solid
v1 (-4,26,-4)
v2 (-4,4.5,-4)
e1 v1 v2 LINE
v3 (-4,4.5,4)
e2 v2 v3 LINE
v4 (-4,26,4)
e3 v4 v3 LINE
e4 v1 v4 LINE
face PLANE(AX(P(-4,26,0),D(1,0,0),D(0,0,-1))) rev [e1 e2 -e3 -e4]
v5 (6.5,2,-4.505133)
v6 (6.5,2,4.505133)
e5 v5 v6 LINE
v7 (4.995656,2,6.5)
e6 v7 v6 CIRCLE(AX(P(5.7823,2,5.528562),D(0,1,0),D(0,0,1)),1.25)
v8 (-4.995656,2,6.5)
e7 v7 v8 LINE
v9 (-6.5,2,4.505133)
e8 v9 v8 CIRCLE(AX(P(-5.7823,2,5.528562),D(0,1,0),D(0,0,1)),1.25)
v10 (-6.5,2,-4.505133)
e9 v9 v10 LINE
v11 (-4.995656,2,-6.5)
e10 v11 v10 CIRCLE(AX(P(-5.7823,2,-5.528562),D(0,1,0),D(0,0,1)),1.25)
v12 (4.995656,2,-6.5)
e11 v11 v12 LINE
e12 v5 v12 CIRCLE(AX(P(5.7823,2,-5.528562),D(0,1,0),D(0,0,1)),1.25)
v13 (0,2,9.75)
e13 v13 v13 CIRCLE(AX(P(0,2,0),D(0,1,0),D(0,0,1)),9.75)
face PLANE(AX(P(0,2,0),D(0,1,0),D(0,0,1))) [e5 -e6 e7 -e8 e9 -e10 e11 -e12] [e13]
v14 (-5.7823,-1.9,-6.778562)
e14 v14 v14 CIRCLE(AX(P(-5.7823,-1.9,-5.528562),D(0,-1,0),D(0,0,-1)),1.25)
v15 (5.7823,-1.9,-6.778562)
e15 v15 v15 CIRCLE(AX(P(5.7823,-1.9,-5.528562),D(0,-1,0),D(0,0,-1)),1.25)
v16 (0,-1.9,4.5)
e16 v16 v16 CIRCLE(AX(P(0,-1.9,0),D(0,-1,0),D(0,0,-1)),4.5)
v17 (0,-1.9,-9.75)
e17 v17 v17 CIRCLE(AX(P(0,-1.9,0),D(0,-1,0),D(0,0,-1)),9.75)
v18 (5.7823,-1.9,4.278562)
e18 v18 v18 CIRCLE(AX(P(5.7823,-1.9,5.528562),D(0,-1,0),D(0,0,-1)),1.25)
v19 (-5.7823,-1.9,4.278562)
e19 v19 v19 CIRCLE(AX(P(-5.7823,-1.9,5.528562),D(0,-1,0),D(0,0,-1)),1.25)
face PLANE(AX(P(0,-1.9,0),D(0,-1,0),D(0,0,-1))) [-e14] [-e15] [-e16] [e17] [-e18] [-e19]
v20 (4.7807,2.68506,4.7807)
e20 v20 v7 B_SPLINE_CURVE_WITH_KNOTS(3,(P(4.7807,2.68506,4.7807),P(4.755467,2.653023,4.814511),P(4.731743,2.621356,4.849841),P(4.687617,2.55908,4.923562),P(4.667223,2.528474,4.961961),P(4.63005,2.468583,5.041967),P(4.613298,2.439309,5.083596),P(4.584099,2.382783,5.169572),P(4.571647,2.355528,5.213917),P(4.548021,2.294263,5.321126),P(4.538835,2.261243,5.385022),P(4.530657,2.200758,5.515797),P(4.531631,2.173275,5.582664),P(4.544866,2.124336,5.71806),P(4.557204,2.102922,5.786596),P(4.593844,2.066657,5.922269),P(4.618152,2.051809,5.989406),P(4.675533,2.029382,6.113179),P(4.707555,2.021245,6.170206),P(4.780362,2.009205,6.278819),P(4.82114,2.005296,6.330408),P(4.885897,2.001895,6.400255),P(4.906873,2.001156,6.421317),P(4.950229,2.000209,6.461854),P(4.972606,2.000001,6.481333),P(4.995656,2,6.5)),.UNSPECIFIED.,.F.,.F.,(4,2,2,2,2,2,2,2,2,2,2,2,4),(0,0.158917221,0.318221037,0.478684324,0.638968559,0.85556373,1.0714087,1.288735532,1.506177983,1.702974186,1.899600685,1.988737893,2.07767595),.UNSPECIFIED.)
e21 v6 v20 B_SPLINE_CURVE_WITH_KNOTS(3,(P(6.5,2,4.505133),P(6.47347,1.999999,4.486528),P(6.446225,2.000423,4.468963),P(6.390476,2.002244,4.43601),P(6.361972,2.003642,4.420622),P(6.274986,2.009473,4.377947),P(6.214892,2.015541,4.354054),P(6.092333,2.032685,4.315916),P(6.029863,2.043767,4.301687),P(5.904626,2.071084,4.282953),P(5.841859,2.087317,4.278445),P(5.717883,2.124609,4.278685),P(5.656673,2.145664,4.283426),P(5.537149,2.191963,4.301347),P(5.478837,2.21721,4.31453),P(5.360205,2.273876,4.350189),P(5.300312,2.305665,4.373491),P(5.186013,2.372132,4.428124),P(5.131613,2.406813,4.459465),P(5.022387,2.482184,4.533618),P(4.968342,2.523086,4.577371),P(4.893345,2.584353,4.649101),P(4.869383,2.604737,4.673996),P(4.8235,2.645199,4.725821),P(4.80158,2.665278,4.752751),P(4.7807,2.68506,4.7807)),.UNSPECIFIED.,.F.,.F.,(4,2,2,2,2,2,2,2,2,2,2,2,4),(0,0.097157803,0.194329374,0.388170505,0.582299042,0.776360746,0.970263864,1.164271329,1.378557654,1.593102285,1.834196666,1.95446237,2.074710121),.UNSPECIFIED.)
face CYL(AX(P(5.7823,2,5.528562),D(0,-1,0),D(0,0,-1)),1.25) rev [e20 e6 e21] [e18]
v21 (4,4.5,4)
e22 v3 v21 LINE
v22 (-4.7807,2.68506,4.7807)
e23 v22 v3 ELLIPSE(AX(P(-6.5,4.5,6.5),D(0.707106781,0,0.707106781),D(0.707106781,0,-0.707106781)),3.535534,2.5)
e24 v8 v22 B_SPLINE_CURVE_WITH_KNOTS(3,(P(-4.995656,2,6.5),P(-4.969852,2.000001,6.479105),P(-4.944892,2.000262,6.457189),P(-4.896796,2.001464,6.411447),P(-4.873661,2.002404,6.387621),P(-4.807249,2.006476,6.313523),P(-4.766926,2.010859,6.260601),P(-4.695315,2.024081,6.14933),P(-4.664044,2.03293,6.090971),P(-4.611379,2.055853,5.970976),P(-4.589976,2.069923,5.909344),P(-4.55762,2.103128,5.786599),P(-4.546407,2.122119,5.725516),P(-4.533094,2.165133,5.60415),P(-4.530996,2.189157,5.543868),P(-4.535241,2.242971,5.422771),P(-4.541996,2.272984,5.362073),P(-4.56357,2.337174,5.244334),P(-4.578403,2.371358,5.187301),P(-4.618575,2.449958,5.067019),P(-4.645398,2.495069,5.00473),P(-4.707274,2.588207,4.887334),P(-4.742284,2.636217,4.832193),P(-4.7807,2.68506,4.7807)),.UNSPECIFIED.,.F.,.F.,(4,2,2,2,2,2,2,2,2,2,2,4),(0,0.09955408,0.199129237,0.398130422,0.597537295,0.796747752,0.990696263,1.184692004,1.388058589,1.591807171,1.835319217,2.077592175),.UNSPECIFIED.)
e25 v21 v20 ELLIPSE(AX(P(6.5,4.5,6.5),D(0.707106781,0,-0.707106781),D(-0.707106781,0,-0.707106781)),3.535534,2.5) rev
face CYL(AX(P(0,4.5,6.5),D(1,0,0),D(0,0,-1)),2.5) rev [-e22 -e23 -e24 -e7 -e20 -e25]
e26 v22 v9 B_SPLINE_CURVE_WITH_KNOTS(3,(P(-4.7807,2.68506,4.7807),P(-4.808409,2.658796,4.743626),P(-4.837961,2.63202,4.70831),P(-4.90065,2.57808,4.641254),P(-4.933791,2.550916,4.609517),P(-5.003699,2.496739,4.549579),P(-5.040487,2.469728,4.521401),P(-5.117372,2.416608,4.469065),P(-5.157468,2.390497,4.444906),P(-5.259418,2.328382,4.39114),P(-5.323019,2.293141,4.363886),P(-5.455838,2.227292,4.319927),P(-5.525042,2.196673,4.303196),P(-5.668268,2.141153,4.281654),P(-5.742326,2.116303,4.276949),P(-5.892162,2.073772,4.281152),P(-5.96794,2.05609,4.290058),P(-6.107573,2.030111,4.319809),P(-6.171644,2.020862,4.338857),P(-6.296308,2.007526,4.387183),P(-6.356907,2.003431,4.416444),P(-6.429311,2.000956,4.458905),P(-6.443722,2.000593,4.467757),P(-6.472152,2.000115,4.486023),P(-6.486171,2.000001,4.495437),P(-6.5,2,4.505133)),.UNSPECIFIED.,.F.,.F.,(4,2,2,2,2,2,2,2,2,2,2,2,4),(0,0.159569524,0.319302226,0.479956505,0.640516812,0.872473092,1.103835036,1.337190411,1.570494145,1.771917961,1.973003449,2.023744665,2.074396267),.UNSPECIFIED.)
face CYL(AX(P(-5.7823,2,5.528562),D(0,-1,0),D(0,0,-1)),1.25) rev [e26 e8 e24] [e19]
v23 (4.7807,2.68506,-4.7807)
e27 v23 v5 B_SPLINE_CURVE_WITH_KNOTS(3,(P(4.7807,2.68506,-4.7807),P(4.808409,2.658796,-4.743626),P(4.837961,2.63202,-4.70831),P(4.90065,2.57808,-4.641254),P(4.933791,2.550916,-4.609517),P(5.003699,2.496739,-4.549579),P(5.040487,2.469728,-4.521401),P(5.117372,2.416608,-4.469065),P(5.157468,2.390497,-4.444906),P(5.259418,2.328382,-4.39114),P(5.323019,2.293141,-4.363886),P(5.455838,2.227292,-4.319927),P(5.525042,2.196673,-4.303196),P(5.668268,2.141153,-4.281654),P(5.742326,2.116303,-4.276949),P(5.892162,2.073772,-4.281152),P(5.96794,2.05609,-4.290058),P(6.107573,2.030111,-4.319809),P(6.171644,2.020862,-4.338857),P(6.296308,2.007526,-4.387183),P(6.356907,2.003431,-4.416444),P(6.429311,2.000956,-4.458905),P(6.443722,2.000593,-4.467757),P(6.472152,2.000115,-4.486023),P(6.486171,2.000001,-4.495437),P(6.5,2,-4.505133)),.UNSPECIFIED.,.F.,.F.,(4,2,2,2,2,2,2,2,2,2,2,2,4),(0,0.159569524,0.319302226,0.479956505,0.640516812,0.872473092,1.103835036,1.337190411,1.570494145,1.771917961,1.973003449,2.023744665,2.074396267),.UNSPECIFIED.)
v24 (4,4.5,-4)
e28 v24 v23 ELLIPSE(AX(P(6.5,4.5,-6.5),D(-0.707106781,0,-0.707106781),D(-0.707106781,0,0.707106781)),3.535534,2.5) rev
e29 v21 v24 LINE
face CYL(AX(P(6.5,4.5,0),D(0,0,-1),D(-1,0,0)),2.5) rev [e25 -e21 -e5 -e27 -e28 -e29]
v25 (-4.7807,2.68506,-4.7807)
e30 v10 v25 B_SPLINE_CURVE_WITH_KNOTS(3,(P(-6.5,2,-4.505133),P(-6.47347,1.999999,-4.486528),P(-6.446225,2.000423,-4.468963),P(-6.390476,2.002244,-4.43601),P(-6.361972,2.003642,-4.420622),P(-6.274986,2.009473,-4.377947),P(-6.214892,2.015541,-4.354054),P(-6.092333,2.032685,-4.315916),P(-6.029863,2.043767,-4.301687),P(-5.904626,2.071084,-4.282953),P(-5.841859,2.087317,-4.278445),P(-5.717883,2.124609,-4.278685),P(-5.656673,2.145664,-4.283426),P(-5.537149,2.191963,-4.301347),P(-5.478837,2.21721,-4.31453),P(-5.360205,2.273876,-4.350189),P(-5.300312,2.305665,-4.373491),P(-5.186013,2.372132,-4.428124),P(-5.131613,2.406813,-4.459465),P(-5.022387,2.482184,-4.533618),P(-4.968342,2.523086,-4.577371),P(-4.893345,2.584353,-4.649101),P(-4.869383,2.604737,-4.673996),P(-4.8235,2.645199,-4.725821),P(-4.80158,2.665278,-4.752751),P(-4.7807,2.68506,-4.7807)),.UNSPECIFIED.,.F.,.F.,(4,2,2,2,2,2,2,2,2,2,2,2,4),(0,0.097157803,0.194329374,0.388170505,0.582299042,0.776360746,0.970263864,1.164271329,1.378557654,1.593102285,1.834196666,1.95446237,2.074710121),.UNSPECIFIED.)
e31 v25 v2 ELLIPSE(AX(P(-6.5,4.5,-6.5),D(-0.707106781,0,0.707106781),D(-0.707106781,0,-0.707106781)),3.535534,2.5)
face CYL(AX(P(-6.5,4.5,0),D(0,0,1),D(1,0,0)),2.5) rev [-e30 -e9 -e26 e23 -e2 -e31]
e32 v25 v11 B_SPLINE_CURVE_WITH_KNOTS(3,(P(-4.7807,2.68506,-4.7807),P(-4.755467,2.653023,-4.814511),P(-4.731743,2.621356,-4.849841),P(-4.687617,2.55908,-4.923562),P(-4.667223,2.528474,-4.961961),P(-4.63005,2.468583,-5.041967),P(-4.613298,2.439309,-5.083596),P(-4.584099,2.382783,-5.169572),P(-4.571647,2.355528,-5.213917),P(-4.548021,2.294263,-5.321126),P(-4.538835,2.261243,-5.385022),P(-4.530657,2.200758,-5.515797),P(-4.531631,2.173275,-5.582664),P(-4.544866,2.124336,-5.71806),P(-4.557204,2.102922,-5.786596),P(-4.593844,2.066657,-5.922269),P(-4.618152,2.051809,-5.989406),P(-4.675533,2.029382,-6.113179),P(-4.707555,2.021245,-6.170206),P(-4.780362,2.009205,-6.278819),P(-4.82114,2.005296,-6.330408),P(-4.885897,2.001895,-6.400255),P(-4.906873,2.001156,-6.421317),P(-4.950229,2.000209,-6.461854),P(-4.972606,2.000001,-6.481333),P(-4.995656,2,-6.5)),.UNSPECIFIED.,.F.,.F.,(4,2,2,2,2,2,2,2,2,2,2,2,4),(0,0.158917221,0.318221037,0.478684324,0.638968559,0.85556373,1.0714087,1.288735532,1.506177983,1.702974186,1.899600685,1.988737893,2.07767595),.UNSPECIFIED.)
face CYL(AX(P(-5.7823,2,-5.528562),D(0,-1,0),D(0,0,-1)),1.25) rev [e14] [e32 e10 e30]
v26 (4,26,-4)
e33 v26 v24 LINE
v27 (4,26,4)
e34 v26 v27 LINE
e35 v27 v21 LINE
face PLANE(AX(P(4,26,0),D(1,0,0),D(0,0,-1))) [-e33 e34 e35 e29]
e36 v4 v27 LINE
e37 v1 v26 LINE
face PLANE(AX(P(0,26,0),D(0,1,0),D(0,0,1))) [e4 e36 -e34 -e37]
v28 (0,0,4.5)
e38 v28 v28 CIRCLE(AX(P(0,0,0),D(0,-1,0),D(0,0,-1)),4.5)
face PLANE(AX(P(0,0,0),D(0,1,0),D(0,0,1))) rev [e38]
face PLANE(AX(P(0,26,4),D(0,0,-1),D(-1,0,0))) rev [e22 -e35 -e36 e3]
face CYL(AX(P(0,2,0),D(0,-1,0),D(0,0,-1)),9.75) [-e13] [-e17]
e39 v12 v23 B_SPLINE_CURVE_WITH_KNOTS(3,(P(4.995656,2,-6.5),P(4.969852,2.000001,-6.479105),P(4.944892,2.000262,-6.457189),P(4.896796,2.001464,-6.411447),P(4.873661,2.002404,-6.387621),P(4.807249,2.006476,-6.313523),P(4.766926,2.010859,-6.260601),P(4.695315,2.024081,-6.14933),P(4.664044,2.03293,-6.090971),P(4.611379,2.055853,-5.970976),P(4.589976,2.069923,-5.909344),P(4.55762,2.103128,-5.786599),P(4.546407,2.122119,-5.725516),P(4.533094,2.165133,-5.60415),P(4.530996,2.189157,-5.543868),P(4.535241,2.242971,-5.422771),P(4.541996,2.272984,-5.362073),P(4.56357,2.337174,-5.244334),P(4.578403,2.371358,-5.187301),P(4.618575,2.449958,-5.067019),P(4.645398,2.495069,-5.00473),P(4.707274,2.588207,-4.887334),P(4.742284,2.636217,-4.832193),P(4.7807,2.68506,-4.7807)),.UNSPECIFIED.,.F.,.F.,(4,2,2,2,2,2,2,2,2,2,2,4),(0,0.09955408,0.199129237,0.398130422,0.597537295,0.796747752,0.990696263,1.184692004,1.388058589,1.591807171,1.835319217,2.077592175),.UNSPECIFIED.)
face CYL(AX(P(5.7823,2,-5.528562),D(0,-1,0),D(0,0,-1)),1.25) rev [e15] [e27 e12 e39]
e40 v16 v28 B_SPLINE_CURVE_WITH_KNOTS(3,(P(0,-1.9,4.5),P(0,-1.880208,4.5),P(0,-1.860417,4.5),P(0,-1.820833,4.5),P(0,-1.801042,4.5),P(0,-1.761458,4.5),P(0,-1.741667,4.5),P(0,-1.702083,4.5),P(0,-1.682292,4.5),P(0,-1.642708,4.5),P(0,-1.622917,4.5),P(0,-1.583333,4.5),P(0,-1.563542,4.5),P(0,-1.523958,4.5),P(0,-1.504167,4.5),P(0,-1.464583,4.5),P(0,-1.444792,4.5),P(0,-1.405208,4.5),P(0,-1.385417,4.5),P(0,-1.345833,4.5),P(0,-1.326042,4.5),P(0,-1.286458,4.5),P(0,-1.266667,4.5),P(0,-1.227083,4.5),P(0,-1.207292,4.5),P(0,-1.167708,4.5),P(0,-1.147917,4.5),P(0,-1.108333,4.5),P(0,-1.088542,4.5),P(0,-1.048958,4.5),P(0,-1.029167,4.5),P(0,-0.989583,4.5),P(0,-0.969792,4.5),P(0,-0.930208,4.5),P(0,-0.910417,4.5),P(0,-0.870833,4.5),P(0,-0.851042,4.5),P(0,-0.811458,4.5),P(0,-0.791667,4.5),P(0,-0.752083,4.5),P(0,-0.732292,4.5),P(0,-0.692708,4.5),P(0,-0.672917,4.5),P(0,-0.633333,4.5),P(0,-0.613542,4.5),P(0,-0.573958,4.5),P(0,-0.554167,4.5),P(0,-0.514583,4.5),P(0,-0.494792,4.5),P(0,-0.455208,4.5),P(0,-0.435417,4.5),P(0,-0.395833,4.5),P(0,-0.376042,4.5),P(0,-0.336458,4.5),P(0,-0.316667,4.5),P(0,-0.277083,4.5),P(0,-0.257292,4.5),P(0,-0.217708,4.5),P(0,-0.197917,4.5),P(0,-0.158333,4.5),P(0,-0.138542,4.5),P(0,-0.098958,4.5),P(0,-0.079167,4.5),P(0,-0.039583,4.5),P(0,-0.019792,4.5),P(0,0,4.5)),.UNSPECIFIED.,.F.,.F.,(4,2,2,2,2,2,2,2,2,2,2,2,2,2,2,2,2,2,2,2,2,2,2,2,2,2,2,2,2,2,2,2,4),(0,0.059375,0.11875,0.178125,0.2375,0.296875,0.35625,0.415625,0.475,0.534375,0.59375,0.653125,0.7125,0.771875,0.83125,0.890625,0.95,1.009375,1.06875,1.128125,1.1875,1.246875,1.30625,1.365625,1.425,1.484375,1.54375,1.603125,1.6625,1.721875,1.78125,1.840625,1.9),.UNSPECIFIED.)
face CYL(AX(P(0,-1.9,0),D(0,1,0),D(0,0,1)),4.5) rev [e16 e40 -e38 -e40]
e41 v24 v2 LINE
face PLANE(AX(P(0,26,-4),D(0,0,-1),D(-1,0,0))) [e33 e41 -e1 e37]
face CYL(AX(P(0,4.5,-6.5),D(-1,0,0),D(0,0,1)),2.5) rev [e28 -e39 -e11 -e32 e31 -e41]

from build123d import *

# Parameters (mm, degrees)
SKETCH1_R           = 9.75
SKETCH1_R_2         = 1.25
BOSS_EXTRUDE2_DEPTH = 2
SKETCH2_W           = 8
SKETCH2_H           = 8
BOSS_EXTRUDE3_DEPTH = 24
BOSS_EXTRUDE5_START = 1.9
SKETCH7_R           = 9.75
SKETCH7_R_2         = 4.5
SKETCH7_R_3         = 1.25
BOSS_EXTRUDE5_DEPTH = 1.9
FILLET1_R           = 2.5


with BuildPart() as part:
    # Sketch1 → Boss-Extrude2 (new body)
    with BuildSketch(Plane(origin=(0, 0, 0), x_dir=(1, 0, 0), z_dir=(0, 1, 0))):
        with Locations(Location((0, 0, 0), (0, 0, 270))):
            Circle(SKETCH1_R)
        with Locations(Location((-5.78230038, 5.52856241, 0), (0, 0, 270))):
            Circle(SKETCH1_R_2, mode=Mode.SUBTRACT)
        with Locations(Location((-5.78230038, -5.52856241, 0), (0, 0, 270))):
            Circle(SKETCH1_R_2, mode=Mode.SUBTRACT)
        with Locations(Location((5.78230038, -5.52856241, 0), (0, 0, 270))):
            Circle(SKETCH1_R_2, mode=Mode.SUBTRACT)
        with Locations(Location((5.78230038, 5.52856241, 0), (0, 0, 270))):
            Circle(SKETCH1_R_2, mode=Mode.SUBTRACT)
    extrude(amount=BOSS_EXTRUDE2_DEPTH)

    # Sketch2 → Boss-Extrude3 (add)
    with BuildSketch(Plane(origin=(0, 2, 0), x_dir=(1, 0, 0), z_dir=(0, 1, 0))):
        Rectangle(SKETCH2_W, SKETCH2_H)
    extrude(amount=BOSS_EXTRUDE3_DEPTH)

    # Sketch7 → Boss-Extrude5 (add)
    with BuildSketch(Plane.XZ.offset(BOSS_EXTRUDE5_START)):
        with Locations(Location((0, 0, 0), (0, 0, 270))):
            Circle(SKETCH7_R)
        with Locations(Location((0, 0, 0), (0, 0, 90))):
            Circle(SKETCH7_R_2, mode=Mode.SUBTRACT)
        with Locations(Location((-5.78230038, 5.52856241, 0), (0, 0, 270))):
            Circle(SKETCH7_R_3, mode=Mode.SUBTRACT)
        with Locations(Location((5.78230038, 5.52856241, 0), (0, 0, 270))):
            Circle(SKETCH7_R_3, mode=Mode.SUBTRACT)
        with Locations(Location((5.78230038, -5.52856241, 0), (0, 0, 270))):
            Circle(SKETCH7_R_3, mode=Mode.SUBTRACT)
        with Locations(Location((-5.78230038, -5.52856241, 0), (0, 0, 270))):
            Circle(SKETCH7_R_3, mode=Mode.SUBTRACT)
    extrude(amount=-BOSS_EXTRUDE5_DEPTH)

    # Fillet1
    # the kernel refuses this fillet: 2.5 mm, written as the material it adds along each edge
    with BuildSketch(Plane(origin=(4, 2, -4), x_dir=(1, 0, 0), z_dir=(0, 0, 1)), Plane(origin=(-4, 2, -4), x_dir=(0, 0, -1), z_dir=(1, 0, 0)), Plane(origin=(4, 2, 4), x_dir=(0, 0, 1), z_dir=(-1, 0, 0)), Plane(origin=(-4, 2, 4), x_dir=(-1, 0, 0), z_dir=(0, 0, -1))) as fillet1_piece_1:
        with BuildLine():
            CenterArc((FILLET1_R, FILLET1_R), FILLET1_R, 180, 90)
            Line((0, FILLET1_R), (0, 0))
            Line((0, 0), (FILLET1_R, 0))
        make_face()
    extrude(amount=8)
    with BuildSketch(Plane(origin=(4, 2, -10.25), x_dir=(1, 0, 0), z_dir=(0, 0, 1))) as fillet1_piece_2a_section:
        with BuildLine():
            CenterArc((FILLET1_R, FILLET1_R), FILLET1_R, 180, 90)
            Line((0, FILLET1_R), (0, 0))
            Line((0, 0), (FILLET1_R, 0))
        make_face()
    fillet1_piece_2a = extrude(amount=14.25, mode=Mode.PRIVATE)
    fillet1_piece_2a = fillet1_piece_2a & Plane(origin=(0, 2.663763666, 0), x_dir=(0, 0, 1), z_dir=(0, -1, 0)) * Cylinder(9.75, 39, mode=Mode.PRIVATE)
    fillet1_piece_2a = fillet1_piece_2a - Plane(origin=(5.78230038, 2.663763666, -5.52856241), x_dir=(0, 0, 1), z_dir=(0, -1, 0)) * Cylinder(1.25, 39, mode=Mode.PRIVATE)
    fillet1_piece_2a = split(fillet1_piece_2a, bisect_by=Plane(origin=(4.398974619, 2.663763666, -4), z_dir=(0, 0, -1)), keep=Keep.TOP, mode=Mode.PRIVATE)
    with BuildSketch(Plane(origin=(-4, 2, -4), x_dir=(0, 0, -1), z_dir=(1, 0, 0))) as fillet1_piece_2b_section:
        with BuildLine():
            CenterArc((FILLET1_R, FILLET1_R), FILLET1_R, 180, 90)
            Line((0, FILLET1_R), (0, 0))
            Line((0, 0), (FILLET1_R, 0))
        make_face()
    fillet1_piece_2b = extrude(amount=14.25, mode=Mode.PRIVATE)
    fillet1_piece_2b = fillet1_piece_2b & Plane(origin=(0, 2.68491829, 0), x_dir=(0, 0, 1), z_dir=(0, -1, 0)) * Cylinder(9.75, 39, mode=Mode.PRIVATE)
    fillet1_piece_2b = fillet1_piece_2b - Plane(origin=(5.78230038, 2.68491829, -5.52856241), x_dir=(0, 0, 1), z_dir=(0, -1, 0)) * Cylinder(1.25, 39, mode=Mode.PRIVATE)
    fillet1_piece_2b = split(fillet1_piece_2b, bisect_by=Plane(origin=(4, 2.68491829, -4.384125447), z_dir=(1, 0, 0)), keep=Keep.TOP, mode=Mode.PRIVATE)
    fillet1_piece_2 = fillet1_piece_2a & fillet1_piece_2b
    add(fillet1_piece_2)
    with BuildSketch(Plane(origin=(10.25, 2, 4), x_dir=(0, 0, 1), z_dir=(-1, 0, 0))) as fillet1_piece_3a_section:
        with BuildLine():
            CenterArc((FILLET1_R, FILLET1_R), FILLET1_R, 180, 90)
            Line((0, FILLET1_R), (0, 0))
            Line((0, 0), (FILLET1_R, 0))
        make_face()
    fillet1_piece_3a = extrude(amount=14.25, mode=Mode.PRIVATE)
    fillet1_piece_3a = fillet1_piece_3a & Plane(origin=(0, 2.684921118, 0), x_dir=(0, 0, 1), z_dir=(0, -1, 0)) * Cylinder(9.75, 39, mode=Mode.PRIVATE)
    fillet1_piece_3a = fillet1_piece_3a - Plane(origin=(5.78230038, 2.684921118, 5.52856241), x_dir=(0, 0, 1), z_dir=(0, -1, 0)) * Cylinder(1.25, 39, mode=Mode.PRIVATE)
    fillet1_piece_3a = split(fillet1_piece_3a, bisect_by=Plane(origin=(4, 2.684921118, 4.384140978), z_dir=(1, 0, 0)), keep=Keep.TOP, mode=Mode.PRIVATE)
    with BuildSketch(Plane(origin=(4, 2, -4), x_dir=(1, 0, 0), z_dir=(0, 0, 1))) as fillet1_piece_3b_section:
        with BuildLine():
            CenterArc((FILLET1_R, FILLET1_R), FILLET1_R, 180, 90)
            Line((0, FILLET1_R), (0, 0))
            Line((0, 0), (FILLET1_R, 0))
        make_face()
    fillet1_piece_3b = extrude(amount=14.25, mode=Mode.PRIVATE)
    fillet1_piece_3b = fillet1_piece_3b & Plane(origin=(0, 2.663763629, 0), x_dir=(0, 0, 1), z_dir=(0, -1, 0)) * Cylinder(9.75, 39, mode=Mode.PRIVATE)
    fillet1_piece_3b = fillet1_piece_3b - Plane(origin=(5.78230038, 2.663763629, 5.52856241), x_dir=(0, 0, 1), z_dir=(0, -1, 0)) * Cylinder(1.25, 39, mode=Mode.PRIVATE)
    fillet1_piece_3b = split(fillet1_piece_3b, bisect_by=Plane(origin=(4.398975598, 2.663763629, 4), z_dir=(0, 0, 1)), keep=Keep.TOP, mode=Mode.PRIVATE)
    fillet1_piece_3 = fillet1_piece_3a & fillet1_piece_3b
    add(fillet1_piece_3)
    with BuildSketch(Plane(origin=(-4, 2, 4), x_dir=(-1, 0, 0), z_dir=(0, 0, -1))) as fillet1_piece_4a_section:
        with BuildLine():
            CenterArc((FILLET1_R, FILLET1_R), FILLET1_R, 180, 90)
            Line((0, FILLET1_R), (0, 0))
            Line((0, 0), (FILLET1_R, 0))
        make_face()
    fillet1_piece_4a = extrude(amount=14.25, mode=Mode.PRIVATE)
    fillet1_piece_4a = fillet1_piece_4a & Plane(origin=(0, 2.663765474, 0), x_dir=(0, 0, 1), z_dir=(0, -1, 0)) * Cylinder(9.75, 39, mode=Mode.PRIVATE)
    fillet1_piece_4a = fillet1_piece_4a - Plane(origin=(-5.78230038, 2.663765474, -5.52856241), x_dir=(0, 0, 1), z_dir=(0, -1, 0)) * Cylinder(1.25, 39, mode=Mode.PRIVATE)
    fillet1_piece_4a = split(fillet1_piece_4a, bisect_by=Plane(origin=(-4.39896904, 2.663765474, -4), z_dir=(0, 0, -1)), keep=Keep.TOP, mode=Mode.PRIVATE)
    with BuildSketch(Plane(origin=(-10.25, 2, -4), x_dir=(0, 0, -1), z_dir=(1, 0, 0))) as fillet1_piece_4b_section:
        with BuildLine():
            CenterArc((FILLET1_R, FILLET1_R), FILLET1_R, 180, 90)
            Line((0, FILLET1_R), (0, 0))
            Line((0, 0), (FILLET1_R, 0))
        make_face()
    fillet1_piece_4b = extrude(amount=14.25, mode=Mode.PRIVATE)
    fillet1_piece_4b = fillet1_piece_4b & Plane(origin=(0, 2.684918127, 0), x_dir=(0, 0, 1), z_dir=(0, -1, 0)) * Cylinder(9.75, 39, mode=Mode.PRIVATE)
    fillet1_piece_4b = fillet1_piece_4b - Plane(origin=(-5.78230038, 2.684918127, -5.52856241), x_dir=(0, 0, 1), z_dir=(0, -1, 0)) * Cylinder(1.25, 39, mode=Mode.PRIVATE)
    fillet1_piece_4b = split(fillet1_piece_4b, bisect_by=Plane(origin=(-4, 2.684918127, -4.384124985), z_dir=(-1, 0, 0)), keep=Keep.TOP, mode=Mode.PRIVATE)
    fillet1_piece_4 = fillet1_piece_4a & fillet1_piece_4b
    add(fillet1_piece_4)
    with BuildSketch(Plane(origin=(-4, 2, 10.25), x_dir=(-1, 0, 0), z_dir=(0, 0, -1))) as fillet1_piece_5a_section:
        with BuildLine():
            CenterArc((FILLET1_R, FILLET1_R), FILLET1_R, 180, 90)
            Line((0, FILLET1_R), (0, 0))
            Line((0, 0), (FILLET1_R, 0))
        make_face()
    fillet1_piece_5a = extrude(amount=14.25, mode=Mode.PRIVATE)
    fillet1_piece_5a = fillet1_piece_5a & Plane(origin=(0, 2.66376539, 0), x_dir=(0, 0, 1), z_dir=(0, -1, 0)) * Cylinder(9.75, 39, mode=Mode.PRIVATE)
    fillet1_piece_5a = fillet1_piece_5a - Plane(origin=(-5.78230038, 2.66376539, 5.52856241), x_dir=(0, 0, 1), z_dir=(0, -1, 0)) * Cylinder(1.25, 39, mode=Mode.PRIVATE)
    fillet1_piece_5a = split(fillet1_piece_5a, bisect_by=Plane(origin=(-4.398969268, 2.66376539, 4), z_dir=(0, 0, 1)), keep=Keep.TOP, mode=Mode.PRIVATE)
    with BuildSketch(Plane(origin=(4, 2, 4), x_dir=(0, 0, 1), z_dir=(-1, 0, 0))) as fillet1_piece_5b_section:
        with BuildLine():
            CenterArc((FILLET1_R, FILLET1_R), FILLET1_R, 180, 90)
            Line((0, FILLET1_R), (0, 0))
            Line((0, 0), (FILLET1_R, 0))
        make_face()
    fillet1_piece_5b = extrude(amount=14.25, mode=Mode.PRIVATE)
    fillet1_piece_5b = fillet1_piece_5b & Plane(origin=(0, 2.684921922, 0), x_dir=(0, 0, 1), z_dir=(0, -1, 0)) * Cylinder(9.75, 39, mode=Mode.PRIVATE)
    fillet1_piece_5b = fillet1_piece_5b - Plane(origin=(-5.78230038, 2.684921922, 5.52856241), x_dir=(0, 0, 1), z_dir=(0, -1, 0)) * Cylinder(1.25, 39, mode=Mode.PRIVATE)
    fillet1_piece_5b = split(fillet1_piece_5b, bisect_by=Plane(origin=(-4, 2.684921922, 4.384144633), z_dir=(-1, 0, 0)), keep=Keep.TOP, mode=Mode.PRIVATE)
    fillet1_piece_5 = fillet1_piece_5a & fillet1_piece_5b
    add(fillet1_piece_5)


solid = part.part
